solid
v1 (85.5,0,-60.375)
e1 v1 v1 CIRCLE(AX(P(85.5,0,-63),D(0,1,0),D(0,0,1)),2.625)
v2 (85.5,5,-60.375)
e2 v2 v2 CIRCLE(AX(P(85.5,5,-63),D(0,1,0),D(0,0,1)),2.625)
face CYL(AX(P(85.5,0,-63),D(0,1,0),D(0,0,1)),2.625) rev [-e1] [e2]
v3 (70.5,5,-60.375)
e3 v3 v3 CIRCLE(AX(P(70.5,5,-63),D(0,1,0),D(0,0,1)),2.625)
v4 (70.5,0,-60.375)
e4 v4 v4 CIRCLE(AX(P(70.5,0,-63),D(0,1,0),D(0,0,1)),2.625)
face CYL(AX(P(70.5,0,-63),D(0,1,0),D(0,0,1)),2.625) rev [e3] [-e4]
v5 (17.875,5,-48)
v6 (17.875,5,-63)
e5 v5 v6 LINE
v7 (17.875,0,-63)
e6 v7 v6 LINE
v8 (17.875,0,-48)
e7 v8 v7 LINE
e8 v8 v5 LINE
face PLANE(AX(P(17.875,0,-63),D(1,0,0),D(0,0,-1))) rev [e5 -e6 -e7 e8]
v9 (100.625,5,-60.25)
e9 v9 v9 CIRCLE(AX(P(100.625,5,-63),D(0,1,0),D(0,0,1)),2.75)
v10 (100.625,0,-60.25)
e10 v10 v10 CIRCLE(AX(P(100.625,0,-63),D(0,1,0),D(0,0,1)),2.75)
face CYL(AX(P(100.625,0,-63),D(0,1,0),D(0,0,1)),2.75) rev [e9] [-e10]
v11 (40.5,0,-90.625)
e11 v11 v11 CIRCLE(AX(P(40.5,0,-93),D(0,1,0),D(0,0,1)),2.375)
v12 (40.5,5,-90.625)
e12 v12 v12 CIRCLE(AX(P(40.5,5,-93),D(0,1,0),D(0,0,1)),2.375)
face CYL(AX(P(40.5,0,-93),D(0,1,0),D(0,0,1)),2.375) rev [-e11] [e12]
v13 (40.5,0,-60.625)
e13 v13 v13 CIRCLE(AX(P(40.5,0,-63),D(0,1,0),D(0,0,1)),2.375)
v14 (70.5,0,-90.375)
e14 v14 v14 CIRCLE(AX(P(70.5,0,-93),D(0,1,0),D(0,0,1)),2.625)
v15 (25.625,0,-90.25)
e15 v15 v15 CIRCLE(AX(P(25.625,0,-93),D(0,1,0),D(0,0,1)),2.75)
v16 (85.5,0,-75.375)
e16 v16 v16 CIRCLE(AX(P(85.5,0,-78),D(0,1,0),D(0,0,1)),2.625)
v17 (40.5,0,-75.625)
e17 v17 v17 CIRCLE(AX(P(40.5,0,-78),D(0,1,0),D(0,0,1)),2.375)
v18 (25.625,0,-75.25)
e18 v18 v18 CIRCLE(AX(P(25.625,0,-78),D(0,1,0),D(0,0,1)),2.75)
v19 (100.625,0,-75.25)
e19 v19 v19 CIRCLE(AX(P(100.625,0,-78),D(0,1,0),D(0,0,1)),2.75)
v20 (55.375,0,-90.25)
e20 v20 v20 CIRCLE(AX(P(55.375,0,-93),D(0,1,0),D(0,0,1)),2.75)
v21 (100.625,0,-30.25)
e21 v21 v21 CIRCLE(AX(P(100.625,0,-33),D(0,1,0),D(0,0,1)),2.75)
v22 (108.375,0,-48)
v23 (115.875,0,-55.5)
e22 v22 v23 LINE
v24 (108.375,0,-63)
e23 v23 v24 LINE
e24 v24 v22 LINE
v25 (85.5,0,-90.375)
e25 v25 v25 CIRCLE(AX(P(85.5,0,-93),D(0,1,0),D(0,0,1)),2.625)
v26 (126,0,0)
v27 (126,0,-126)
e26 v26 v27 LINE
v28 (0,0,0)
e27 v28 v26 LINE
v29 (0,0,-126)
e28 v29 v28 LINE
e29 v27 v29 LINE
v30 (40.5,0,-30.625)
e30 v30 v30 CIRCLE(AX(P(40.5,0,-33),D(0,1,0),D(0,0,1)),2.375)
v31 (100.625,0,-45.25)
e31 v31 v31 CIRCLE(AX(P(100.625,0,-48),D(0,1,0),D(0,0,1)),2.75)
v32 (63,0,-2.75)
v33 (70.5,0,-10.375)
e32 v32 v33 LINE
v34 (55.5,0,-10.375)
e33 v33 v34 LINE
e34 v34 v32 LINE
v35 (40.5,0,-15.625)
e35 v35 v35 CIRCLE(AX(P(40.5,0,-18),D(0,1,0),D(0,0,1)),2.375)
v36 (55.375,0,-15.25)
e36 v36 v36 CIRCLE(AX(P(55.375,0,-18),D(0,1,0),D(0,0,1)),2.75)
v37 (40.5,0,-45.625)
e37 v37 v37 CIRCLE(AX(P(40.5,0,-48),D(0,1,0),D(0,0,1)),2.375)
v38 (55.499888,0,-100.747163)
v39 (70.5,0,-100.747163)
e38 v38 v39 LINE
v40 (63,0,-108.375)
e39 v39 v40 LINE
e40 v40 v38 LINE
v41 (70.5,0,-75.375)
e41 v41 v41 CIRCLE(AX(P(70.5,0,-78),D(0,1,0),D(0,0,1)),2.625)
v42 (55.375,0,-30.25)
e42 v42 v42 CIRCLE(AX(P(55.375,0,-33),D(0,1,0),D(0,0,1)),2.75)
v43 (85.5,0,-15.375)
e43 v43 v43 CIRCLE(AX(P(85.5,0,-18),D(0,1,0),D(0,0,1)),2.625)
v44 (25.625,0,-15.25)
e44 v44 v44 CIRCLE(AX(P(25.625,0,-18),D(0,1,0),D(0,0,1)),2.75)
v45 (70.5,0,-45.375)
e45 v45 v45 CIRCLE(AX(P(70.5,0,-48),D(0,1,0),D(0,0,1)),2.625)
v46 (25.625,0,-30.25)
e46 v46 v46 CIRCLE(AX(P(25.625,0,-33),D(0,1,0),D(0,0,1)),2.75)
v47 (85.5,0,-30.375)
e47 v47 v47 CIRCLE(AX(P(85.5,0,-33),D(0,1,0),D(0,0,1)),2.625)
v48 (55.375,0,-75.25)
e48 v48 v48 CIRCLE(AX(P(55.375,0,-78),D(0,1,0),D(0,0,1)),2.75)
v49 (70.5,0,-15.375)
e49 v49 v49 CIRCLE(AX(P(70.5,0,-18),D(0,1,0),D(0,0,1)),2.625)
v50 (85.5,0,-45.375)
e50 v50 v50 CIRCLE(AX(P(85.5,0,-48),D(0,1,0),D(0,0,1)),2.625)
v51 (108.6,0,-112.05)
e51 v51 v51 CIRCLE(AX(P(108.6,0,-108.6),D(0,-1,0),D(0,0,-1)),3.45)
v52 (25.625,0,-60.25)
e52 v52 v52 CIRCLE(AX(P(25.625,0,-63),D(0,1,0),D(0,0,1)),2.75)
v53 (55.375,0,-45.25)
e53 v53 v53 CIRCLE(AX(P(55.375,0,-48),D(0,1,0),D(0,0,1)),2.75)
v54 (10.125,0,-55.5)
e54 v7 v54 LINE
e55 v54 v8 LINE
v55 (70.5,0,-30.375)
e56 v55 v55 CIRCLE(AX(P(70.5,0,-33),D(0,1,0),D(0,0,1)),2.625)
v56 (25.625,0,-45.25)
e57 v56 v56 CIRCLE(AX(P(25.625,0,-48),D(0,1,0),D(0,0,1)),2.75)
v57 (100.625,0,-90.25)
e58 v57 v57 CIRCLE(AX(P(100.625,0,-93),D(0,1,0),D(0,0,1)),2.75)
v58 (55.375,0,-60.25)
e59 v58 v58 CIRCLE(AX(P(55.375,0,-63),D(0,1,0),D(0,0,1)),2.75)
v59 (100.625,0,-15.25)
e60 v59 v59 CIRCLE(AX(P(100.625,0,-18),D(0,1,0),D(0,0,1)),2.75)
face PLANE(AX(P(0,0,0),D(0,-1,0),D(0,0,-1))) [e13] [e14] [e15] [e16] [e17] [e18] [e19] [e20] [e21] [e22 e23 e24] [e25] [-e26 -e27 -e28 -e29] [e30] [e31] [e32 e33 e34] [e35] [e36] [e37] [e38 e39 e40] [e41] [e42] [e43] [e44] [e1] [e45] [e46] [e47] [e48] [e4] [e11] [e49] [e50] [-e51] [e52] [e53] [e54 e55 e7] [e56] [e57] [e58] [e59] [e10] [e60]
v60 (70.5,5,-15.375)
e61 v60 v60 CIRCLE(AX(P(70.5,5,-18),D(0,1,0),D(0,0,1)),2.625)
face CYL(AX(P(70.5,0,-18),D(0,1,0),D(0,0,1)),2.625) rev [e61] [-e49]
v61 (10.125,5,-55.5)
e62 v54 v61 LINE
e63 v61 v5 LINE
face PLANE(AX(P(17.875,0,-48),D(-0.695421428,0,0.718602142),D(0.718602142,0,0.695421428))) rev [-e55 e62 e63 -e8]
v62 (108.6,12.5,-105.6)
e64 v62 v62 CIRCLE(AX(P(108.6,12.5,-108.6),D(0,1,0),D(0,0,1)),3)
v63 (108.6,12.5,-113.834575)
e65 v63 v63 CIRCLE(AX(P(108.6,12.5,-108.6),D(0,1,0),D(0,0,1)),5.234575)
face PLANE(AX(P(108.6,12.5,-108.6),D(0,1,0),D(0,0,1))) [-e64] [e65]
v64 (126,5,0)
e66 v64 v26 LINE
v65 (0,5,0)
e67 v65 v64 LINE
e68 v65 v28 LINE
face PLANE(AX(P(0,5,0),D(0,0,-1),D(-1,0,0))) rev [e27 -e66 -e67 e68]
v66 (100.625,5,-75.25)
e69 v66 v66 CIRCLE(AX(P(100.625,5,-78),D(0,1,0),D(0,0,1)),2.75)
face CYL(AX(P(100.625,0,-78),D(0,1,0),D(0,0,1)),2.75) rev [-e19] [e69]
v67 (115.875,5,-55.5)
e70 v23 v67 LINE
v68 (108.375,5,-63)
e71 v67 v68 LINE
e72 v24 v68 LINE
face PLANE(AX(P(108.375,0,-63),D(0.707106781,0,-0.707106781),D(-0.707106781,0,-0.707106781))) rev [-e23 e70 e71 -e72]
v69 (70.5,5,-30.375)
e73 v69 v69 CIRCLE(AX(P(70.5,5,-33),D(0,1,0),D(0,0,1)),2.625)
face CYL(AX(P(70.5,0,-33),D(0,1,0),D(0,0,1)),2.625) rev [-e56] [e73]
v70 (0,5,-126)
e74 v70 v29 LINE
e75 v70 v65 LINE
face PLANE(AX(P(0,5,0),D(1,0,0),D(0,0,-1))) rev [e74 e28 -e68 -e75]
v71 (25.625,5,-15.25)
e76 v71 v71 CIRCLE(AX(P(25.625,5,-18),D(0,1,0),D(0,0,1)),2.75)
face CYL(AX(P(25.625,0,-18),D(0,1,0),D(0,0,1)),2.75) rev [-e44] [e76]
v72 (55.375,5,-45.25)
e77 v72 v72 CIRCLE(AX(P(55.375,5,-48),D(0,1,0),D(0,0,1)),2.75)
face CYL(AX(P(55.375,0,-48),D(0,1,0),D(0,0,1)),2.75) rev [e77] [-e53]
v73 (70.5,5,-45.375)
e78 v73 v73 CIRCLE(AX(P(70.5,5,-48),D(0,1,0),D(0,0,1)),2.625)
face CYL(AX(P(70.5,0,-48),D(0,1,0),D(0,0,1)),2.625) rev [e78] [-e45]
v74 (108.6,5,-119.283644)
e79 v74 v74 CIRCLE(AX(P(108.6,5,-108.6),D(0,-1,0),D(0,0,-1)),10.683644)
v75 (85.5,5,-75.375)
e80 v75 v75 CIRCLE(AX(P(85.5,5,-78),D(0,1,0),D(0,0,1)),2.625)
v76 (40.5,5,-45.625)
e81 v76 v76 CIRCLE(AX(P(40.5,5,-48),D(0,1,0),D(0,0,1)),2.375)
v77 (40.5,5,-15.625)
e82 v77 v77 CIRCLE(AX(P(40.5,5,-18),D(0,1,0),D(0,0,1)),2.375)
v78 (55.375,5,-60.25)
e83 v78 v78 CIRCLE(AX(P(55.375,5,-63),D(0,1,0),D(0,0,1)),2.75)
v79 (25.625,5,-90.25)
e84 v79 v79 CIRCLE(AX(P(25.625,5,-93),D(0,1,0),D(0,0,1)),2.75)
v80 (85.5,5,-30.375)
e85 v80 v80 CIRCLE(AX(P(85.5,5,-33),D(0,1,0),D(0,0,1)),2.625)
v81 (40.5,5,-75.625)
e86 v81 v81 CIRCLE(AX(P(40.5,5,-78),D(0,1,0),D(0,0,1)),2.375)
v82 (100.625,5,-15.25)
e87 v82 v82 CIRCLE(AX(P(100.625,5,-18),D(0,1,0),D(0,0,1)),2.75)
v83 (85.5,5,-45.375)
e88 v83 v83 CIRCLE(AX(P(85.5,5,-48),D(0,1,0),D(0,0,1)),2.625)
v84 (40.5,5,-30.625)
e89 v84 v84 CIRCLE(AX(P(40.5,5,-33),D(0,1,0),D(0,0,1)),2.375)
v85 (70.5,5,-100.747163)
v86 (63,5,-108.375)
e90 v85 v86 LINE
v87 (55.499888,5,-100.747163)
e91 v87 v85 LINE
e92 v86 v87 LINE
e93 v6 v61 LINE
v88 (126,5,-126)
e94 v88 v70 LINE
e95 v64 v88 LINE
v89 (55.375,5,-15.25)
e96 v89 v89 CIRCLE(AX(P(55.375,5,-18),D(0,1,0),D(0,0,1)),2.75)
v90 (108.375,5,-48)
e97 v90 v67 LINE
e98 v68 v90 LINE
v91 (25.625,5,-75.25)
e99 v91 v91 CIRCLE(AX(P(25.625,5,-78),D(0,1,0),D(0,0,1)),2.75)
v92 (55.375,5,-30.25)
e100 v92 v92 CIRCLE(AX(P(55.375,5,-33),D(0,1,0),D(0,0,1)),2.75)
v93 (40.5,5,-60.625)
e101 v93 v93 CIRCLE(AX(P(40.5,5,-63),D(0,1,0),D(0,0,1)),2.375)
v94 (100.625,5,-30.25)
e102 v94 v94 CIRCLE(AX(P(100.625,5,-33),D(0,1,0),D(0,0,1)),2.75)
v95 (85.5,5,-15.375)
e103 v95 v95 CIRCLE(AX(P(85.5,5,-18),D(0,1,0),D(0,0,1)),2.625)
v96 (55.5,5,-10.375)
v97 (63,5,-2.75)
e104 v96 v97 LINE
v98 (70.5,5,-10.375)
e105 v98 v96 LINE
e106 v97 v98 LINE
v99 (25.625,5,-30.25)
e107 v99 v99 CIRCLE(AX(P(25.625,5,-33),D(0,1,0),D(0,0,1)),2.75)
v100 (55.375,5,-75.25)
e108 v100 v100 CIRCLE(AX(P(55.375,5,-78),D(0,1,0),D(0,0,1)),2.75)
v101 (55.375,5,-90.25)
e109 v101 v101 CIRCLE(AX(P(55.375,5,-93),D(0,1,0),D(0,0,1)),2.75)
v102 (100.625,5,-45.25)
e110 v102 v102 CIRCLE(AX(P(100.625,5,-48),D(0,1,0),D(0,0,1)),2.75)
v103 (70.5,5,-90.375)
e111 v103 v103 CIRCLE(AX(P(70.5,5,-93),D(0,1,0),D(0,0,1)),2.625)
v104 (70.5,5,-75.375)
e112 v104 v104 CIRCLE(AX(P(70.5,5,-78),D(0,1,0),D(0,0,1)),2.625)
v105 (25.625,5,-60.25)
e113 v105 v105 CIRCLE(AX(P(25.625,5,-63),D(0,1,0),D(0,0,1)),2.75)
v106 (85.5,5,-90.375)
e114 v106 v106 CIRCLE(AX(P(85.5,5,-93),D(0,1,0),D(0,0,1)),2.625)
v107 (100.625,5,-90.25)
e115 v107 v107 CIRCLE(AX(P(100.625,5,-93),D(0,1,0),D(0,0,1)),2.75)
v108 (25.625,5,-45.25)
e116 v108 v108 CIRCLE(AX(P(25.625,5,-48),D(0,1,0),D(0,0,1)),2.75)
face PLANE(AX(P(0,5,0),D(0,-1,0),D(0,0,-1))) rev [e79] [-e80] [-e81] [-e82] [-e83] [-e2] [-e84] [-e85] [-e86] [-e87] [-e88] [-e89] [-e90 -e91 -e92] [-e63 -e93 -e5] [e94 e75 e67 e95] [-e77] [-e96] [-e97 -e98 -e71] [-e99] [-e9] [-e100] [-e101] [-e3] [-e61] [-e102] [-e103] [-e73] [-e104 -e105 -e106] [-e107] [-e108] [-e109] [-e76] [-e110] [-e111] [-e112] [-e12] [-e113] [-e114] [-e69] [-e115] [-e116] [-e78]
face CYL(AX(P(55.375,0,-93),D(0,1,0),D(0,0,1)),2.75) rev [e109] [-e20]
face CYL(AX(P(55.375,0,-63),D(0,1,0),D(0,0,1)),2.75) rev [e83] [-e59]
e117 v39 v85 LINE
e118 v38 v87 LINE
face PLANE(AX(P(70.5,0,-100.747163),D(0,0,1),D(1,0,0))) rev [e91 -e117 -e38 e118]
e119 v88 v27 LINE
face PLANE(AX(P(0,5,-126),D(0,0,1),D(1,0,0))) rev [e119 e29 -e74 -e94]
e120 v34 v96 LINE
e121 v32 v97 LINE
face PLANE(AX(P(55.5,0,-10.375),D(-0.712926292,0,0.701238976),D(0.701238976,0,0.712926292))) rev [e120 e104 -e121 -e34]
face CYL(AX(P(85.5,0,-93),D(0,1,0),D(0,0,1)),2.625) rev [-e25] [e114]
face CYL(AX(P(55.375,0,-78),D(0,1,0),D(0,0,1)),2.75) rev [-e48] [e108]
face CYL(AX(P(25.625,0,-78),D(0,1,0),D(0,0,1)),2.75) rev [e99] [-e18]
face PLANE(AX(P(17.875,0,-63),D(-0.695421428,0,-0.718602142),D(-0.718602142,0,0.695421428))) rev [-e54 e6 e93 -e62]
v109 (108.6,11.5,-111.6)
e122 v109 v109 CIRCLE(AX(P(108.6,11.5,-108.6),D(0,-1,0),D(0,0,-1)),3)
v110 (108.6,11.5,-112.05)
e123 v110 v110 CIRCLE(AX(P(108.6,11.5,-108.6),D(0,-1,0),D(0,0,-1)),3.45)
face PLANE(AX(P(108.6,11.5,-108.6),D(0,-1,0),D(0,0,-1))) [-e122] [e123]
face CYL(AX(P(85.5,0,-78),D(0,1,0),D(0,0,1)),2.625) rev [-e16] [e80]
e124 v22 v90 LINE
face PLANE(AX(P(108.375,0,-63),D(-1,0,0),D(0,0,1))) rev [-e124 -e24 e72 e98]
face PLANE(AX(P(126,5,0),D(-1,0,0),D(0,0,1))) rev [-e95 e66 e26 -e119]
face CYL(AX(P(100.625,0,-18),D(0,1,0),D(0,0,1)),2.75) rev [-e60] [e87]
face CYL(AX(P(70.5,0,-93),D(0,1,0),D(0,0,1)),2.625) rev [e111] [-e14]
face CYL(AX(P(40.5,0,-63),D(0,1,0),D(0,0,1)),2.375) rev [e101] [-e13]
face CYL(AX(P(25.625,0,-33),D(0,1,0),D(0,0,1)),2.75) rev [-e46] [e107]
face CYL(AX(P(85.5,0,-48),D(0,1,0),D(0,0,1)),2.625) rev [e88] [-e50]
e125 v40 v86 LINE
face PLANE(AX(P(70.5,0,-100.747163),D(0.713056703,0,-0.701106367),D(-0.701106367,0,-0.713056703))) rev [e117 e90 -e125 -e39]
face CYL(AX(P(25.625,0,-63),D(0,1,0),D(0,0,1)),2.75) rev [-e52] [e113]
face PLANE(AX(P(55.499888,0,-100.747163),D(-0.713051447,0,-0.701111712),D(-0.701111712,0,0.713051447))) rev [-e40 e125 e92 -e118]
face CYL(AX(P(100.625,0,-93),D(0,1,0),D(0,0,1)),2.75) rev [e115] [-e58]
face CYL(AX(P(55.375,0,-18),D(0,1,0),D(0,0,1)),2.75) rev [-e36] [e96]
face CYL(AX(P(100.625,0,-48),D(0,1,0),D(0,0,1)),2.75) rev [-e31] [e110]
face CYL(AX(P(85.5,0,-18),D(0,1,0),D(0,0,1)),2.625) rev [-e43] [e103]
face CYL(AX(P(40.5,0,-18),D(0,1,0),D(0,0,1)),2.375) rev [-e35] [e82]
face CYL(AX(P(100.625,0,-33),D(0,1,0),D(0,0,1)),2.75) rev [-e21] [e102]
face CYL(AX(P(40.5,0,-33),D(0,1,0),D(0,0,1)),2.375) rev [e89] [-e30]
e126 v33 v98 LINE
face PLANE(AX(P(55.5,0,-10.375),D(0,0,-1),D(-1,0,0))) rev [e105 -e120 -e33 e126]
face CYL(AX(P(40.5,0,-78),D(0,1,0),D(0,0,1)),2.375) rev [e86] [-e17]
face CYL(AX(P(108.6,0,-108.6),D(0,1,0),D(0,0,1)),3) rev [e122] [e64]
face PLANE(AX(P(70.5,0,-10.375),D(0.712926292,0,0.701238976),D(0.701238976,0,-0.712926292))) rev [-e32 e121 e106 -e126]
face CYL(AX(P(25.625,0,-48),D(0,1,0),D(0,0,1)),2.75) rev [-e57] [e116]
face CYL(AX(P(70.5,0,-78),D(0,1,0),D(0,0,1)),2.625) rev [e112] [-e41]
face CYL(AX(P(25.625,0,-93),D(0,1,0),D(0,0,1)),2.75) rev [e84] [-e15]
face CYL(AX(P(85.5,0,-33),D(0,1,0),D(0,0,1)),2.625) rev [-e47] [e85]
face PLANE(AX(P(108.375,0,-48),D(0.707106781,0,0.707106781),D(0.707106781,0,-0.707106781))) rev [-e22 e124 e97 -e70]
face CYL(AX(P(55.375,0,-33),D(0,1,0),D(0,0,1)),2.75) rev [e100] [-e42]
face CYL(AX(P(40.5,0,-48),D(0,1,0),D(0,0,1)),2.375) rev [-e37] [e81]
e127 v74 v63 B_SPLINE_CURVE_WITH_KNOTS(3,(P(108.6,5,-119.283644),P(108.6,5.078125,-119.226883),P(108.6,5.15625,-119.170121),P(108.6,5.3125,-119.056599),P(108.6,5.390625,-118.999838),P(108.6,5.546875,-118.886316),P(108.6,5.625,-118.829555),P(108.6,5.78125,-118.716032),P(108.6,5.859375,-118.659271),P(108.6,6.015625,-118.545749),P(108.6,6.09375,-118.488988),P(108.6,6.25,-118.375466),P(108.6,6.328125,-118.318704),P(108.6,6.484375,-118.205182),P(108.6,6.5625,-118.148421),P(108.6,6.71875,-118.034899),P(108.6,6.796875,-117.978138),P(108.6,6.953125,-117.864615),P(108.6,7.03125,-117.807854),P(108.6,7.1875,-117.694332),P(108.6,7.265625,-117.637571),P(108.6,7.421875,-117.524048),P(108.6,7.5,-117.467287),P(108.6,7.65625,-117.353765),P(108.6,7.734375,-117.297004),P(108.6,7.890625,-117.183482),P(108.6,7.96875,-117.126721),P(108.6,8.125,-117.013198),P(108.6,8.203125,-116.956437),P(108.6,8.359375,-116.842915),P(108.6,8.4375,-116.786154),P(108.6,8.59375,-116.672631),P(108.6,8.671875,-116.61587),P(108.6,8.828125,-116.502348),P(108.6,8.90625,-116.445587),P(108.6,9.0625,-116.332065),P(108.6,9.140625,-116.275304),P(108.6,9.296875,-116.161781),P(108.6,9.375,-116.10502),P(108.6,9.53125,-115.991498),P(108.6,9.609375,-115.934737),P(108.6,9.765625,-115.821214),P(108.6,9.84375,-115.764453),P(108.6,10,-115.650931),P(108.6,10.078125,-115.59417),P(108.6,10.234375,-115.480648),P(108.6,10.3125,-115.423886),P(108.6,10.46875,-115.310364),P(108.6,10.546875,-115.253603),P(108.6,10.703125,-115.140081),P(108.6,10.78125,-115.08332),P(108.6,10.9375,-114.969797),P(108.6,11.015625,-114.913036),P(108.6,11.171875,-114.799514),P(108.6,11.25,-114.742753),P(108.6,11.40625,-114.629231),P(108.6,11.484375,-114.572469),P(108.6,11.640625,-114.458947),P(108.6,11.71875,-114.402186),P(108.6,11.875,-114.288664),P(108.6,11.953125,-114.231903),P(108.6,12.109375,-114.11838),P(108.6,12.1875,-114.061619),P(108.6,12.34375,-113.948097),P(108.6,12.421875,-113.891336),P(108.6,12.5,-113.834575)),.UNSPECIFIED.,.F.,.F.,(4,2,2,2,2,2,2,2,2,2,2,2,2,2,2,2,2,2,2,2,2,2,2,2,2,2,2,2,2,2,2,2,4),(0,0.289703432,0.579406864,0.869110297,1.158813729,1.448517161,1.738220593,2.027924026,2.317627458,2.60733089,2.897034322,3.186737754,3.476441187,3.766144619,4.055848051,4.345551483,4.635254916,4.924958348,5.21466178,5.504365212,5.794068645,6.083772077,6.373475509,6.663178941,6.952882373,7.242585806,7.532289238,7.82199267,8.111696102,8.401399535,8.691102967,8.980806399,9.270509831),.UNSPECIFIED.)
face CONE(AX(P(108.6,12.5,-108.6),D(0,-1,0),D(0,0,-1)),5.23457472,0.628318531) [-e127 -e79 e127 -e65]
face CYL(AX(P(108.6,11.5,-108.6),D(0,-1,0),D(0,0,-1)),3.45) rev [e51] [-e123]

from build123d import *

# Parameters (mm, degrees)
SKETCH1_W           = 126
SKETCH1_H           = 126
BOSS_EXTRUDE1_DEPTH = 5
SKETCH3_R           = 12.5
BOSS_EXTRUDE2_DEPTH = 7.5
SKETCH4_R           = 3.45
CUT_EXTRUDE1_DEPTH  = 11.5
SKETCH6_R           = 3
CUT_EXTRUDE2_DEPTH  = 179.628805068
CHAMFER1_SIZE       = 10
CHAMFER1_SIZE_2     = 7.26542528
SKETCH7_R           = 2.75
SKETCH7_R_2         = 2.625
SKETCH7_R_3         = 2.375
CUT_EXTRUDE3_DEPTH  = 179.348675353
CUT_EXTRUDE4_DEPTH  = 179.348675353


with BuildPart() as part:
    # Sketch1 → Boss-Extrude1 (new body)
    with BuildSketch(Plane(origin=(0, 0, 0), x_dir=(1, 0, 0), z_dir=(0, 1, 0))):
        with Locations((63, 63)):
            Rectangle(SKETCH1_W, SKETCH1_H)
    extrude(amount=BOSS_EXTRUDE1_DEPTH)

    # Sketch3 → Boss-Extrude2 (add)
    with BuildSketch(Plane(origin=(0, 5, 0), x_dir=(1, 0, 0), z_dir=(0, 1, 0))):
        with Locations(Location((108.6, 108.6, 0), (0, 0, 90))):
            Circle(SKETCH3_R)
    extrude(amount=BOSS_EXTRUDE2_DEPTH)

    # Sketch4 → Cut-Extrude1 (cut)
    with BuildSketch(Plane.XZ):
        with Locations(Location((108.6, -108.6, 0), (0, 0, 270))):
            Circle(SKETCH4_R)
    extrude(amount=-CUT_EXTRUDE1_DEPTH, mode=Mode.SUBTRACT)

    # Sketch6 → Cut-Extrude2 (cut, through all)
    with BuildSketch(Plane(origin=(0, 12.5, 0), x_dir=(1, 0, 0), z_dir=(0, 1, 0))):
        with Locations(Location((108.6, 108.6, 0), (0, 0, 270))):
            Circle(SKETCH6_R)
    extrude(amount=-CUT_EXTRUDE2_DEPTH, mode=Mode.SUBTRACT)

    # Chamfer1
    # the kernel refuses this chamfer: 10, 7.26542528 mm, written as the material it takes off along each edge
    with BuildSketch(Plane(origin=(108.6, 12.5, -108.6), x_dir=(0, 0, -1), z_dir=(1, 0, 0))) as chamfer1_piece_1_section:
        Polygon((12.5, -CHAMFER1_SIZE), (12.5 - CHAMFER1_SIZE_2, 0), (12.5, 0), align=None)
    chamfer1_piece_1 = revolve(axis=Axis((108.6, 12.5, -108.6), (0, 1, 0)), mode=Mode.PRIVATE)
    chamfer1_piece_1 = split(chamfer1_piece_1, bisect_by=Plane(origin=(108.6, 5, -100.650989912), z_dir=(0, 1, 0)), keep=Keep.TOP, mode=Mode.PRIVATE)
    add(chamfer1_piece_1, mode=Mode.SUBTRACT)

    # Sketch7 → Cut-Extrude3 (cut, through all)
    with BuildSketch(Plane(origin=(0, 5, 0), x_dir=(1, 0, 0), z_dir=(0, 1, 0))):
        with Locations(Location((55.375, 63, 0), (0, 0, 270))):
            Circle(SKETCH7_R)
        with Locations(Location((70.5, 63, 0), (0, 0, 270))):
            Circle(SKETCH7_R_2)
        with Locations(Location((40.5, 63, 0), (0, 0, 270))):
            Circle(SKETCH7_R_3)
        with Locations(Location((85.5, 63, 0), (0, 0, 270))):
            Circle(SKETCH7_R_2)
        with Locations(Location((25.625, 63, 0), (0, 0, 270))):
            Circle(SKETCH7_R)
        with Locations(Location((100.625, 63, 0), (0, 0, 270))):
            Circle(SKETCH7_R)
        with Locations(Location((25.625, 48, 0), (0, 0, 270))):
            Circle(SKETCH7_R)
        with Locations(Location((40.5, 48, 0), (0, 0, 270))):
            Circle(SKETCH7_R_3)
        with Locations(Location((55.375, 48, 0), (0, 0, 270))):
            Circle(SKETCH7_R)
        with Locations(Location((70.5, 48, 0), (0, 0, 270))):
            Circle(SKETCH7_R_2)
        with Locations(Location((85.5, 48, 0), (0, 0, 270))):
            Circle(SKETCH7_R_2)
        with Locations(Location((100.625, 48, 0), (0, 0, 270))):
            Circle(SKETCH7_R)
        with Locations(Location((25.625, 33, 0), (0, 0, 270))):
            Circle(SKETCH7_R)
        with Locations(Location((40.5, 33, 0), (0, 0, 270))):
            Circle(SKETCH7_R_3)
        with Locations(Location((55.375, 33, 0), (0, 0, 270))):
            Circle(SKETCH7_R)
        with Locations(Location((70.5, 33, 0), (0, 0, 270))):
            Circle(SKETCH7_R_2)
        with Locations(Location((85.5, 33, 0), (0, 0, 270))):
            Circle(SKETCH7_R_2)
        with Locations(Location((100.625, 33, 0), (0, 0, 270))):
            Circle(SKETCH7_R)
        with Locations(Location((25.625, 18, 0), (0, 0, 270))):
            Circle(SKETCH7_R)
        with Locations(Location((40.5, 18, 0), (0, 0, 270))):
            Circle(SKETCH7_R_3)
        with Locations(Location((55.375, 18, 0), (0, 0, 270))):
            Circle(SKETCH7_R)
        with Locations(Location((70.5, 18, 0), (0, 0, 270))):
            Circle(SKETCH7_R_2)
        with Locations(Location((85.5, 18, 0), (0, 0, 270))):
            Circle(SKETCH7_R_2)
        with Locations(Location((100.625, 18, 0), (0, 0, 270))):
            Circle(SKETCH7_R)
        with Locations(Location((25.625, 78, 0), (0, 0, 270))):
            Circle(SKETCH7_R)
        with Locations(Location((40.5, 78, 0), (0, 0, 270))):
            Circle(SKETCH7_R_3)
        with Locations(Location((55.375, 78, 0), (0, 0, 270))):
            Circle(SKETCH7_R)
        with Locations(Location((70.5, 78, 0), (0, 0, 270))):
            Circle(SKETCH7_R_2)
        with Locations(Location((85.5, 78, 0), (0, 0, 270))):
            Circle(SKETCH7_R_2)
        with Locations(Location((100.625, 78, 0), (0, 0, 270))):
            Circle(SKETCH7_R)
        with Locations(Location((25.625, 93, 0), (0, 0, 270))):
            Circle(SKETCH7_R)
        with Locations(Location((40.5, 93, 0), (0, 0, 270))):
            Circle(SKETCH7_R_3)
        with Locations(Location((55.375, 93, 0), (0, 0, 270))):
            Circle(SKETCH7_R)
        with Locations(Location((70.5, 93, 0), (0, 0, 270))):
            Circle(SKETCH7_R_2)
        with Locations(Location((85.5, 93, 0), (0, 0, 270))):
            Circle(SKETCH7_R_2)
        with Locations(Location((100.625, 93, 0), (0, 0, 270))):
            Circle(SKETCH7_R)
    extrude(amount=-CUT_EXTRUDE3_DEPTH, mode=Mode.SUBTRACT)

    # Sketch8 → Cut-Extrude4 (cut, through all)
    with BuildSketch(Plane(origin=(0, 5, 0), x_dir=(1, 0, 0), z_dir=(0, 1, 0))):
        Polygon((70.5, 100.747162737), (63, 108.375), (55.49988754, 100.747162737), align=None)
        Polygon((108.375, 63), (115.875, 55.5), (108.375, 48), align=None)
        Polygon((55.5, 10.375), (63, 2.75), (70.5, 10.375), align=None)
        Polygon((17.875, 63), (17.875, 48), (10.125, 55.5), align=None)
    extrude(amount=-CUT_EXTRUDE4_DEPTH, mode=Mode.SUBTRACT)


solid = part.part
